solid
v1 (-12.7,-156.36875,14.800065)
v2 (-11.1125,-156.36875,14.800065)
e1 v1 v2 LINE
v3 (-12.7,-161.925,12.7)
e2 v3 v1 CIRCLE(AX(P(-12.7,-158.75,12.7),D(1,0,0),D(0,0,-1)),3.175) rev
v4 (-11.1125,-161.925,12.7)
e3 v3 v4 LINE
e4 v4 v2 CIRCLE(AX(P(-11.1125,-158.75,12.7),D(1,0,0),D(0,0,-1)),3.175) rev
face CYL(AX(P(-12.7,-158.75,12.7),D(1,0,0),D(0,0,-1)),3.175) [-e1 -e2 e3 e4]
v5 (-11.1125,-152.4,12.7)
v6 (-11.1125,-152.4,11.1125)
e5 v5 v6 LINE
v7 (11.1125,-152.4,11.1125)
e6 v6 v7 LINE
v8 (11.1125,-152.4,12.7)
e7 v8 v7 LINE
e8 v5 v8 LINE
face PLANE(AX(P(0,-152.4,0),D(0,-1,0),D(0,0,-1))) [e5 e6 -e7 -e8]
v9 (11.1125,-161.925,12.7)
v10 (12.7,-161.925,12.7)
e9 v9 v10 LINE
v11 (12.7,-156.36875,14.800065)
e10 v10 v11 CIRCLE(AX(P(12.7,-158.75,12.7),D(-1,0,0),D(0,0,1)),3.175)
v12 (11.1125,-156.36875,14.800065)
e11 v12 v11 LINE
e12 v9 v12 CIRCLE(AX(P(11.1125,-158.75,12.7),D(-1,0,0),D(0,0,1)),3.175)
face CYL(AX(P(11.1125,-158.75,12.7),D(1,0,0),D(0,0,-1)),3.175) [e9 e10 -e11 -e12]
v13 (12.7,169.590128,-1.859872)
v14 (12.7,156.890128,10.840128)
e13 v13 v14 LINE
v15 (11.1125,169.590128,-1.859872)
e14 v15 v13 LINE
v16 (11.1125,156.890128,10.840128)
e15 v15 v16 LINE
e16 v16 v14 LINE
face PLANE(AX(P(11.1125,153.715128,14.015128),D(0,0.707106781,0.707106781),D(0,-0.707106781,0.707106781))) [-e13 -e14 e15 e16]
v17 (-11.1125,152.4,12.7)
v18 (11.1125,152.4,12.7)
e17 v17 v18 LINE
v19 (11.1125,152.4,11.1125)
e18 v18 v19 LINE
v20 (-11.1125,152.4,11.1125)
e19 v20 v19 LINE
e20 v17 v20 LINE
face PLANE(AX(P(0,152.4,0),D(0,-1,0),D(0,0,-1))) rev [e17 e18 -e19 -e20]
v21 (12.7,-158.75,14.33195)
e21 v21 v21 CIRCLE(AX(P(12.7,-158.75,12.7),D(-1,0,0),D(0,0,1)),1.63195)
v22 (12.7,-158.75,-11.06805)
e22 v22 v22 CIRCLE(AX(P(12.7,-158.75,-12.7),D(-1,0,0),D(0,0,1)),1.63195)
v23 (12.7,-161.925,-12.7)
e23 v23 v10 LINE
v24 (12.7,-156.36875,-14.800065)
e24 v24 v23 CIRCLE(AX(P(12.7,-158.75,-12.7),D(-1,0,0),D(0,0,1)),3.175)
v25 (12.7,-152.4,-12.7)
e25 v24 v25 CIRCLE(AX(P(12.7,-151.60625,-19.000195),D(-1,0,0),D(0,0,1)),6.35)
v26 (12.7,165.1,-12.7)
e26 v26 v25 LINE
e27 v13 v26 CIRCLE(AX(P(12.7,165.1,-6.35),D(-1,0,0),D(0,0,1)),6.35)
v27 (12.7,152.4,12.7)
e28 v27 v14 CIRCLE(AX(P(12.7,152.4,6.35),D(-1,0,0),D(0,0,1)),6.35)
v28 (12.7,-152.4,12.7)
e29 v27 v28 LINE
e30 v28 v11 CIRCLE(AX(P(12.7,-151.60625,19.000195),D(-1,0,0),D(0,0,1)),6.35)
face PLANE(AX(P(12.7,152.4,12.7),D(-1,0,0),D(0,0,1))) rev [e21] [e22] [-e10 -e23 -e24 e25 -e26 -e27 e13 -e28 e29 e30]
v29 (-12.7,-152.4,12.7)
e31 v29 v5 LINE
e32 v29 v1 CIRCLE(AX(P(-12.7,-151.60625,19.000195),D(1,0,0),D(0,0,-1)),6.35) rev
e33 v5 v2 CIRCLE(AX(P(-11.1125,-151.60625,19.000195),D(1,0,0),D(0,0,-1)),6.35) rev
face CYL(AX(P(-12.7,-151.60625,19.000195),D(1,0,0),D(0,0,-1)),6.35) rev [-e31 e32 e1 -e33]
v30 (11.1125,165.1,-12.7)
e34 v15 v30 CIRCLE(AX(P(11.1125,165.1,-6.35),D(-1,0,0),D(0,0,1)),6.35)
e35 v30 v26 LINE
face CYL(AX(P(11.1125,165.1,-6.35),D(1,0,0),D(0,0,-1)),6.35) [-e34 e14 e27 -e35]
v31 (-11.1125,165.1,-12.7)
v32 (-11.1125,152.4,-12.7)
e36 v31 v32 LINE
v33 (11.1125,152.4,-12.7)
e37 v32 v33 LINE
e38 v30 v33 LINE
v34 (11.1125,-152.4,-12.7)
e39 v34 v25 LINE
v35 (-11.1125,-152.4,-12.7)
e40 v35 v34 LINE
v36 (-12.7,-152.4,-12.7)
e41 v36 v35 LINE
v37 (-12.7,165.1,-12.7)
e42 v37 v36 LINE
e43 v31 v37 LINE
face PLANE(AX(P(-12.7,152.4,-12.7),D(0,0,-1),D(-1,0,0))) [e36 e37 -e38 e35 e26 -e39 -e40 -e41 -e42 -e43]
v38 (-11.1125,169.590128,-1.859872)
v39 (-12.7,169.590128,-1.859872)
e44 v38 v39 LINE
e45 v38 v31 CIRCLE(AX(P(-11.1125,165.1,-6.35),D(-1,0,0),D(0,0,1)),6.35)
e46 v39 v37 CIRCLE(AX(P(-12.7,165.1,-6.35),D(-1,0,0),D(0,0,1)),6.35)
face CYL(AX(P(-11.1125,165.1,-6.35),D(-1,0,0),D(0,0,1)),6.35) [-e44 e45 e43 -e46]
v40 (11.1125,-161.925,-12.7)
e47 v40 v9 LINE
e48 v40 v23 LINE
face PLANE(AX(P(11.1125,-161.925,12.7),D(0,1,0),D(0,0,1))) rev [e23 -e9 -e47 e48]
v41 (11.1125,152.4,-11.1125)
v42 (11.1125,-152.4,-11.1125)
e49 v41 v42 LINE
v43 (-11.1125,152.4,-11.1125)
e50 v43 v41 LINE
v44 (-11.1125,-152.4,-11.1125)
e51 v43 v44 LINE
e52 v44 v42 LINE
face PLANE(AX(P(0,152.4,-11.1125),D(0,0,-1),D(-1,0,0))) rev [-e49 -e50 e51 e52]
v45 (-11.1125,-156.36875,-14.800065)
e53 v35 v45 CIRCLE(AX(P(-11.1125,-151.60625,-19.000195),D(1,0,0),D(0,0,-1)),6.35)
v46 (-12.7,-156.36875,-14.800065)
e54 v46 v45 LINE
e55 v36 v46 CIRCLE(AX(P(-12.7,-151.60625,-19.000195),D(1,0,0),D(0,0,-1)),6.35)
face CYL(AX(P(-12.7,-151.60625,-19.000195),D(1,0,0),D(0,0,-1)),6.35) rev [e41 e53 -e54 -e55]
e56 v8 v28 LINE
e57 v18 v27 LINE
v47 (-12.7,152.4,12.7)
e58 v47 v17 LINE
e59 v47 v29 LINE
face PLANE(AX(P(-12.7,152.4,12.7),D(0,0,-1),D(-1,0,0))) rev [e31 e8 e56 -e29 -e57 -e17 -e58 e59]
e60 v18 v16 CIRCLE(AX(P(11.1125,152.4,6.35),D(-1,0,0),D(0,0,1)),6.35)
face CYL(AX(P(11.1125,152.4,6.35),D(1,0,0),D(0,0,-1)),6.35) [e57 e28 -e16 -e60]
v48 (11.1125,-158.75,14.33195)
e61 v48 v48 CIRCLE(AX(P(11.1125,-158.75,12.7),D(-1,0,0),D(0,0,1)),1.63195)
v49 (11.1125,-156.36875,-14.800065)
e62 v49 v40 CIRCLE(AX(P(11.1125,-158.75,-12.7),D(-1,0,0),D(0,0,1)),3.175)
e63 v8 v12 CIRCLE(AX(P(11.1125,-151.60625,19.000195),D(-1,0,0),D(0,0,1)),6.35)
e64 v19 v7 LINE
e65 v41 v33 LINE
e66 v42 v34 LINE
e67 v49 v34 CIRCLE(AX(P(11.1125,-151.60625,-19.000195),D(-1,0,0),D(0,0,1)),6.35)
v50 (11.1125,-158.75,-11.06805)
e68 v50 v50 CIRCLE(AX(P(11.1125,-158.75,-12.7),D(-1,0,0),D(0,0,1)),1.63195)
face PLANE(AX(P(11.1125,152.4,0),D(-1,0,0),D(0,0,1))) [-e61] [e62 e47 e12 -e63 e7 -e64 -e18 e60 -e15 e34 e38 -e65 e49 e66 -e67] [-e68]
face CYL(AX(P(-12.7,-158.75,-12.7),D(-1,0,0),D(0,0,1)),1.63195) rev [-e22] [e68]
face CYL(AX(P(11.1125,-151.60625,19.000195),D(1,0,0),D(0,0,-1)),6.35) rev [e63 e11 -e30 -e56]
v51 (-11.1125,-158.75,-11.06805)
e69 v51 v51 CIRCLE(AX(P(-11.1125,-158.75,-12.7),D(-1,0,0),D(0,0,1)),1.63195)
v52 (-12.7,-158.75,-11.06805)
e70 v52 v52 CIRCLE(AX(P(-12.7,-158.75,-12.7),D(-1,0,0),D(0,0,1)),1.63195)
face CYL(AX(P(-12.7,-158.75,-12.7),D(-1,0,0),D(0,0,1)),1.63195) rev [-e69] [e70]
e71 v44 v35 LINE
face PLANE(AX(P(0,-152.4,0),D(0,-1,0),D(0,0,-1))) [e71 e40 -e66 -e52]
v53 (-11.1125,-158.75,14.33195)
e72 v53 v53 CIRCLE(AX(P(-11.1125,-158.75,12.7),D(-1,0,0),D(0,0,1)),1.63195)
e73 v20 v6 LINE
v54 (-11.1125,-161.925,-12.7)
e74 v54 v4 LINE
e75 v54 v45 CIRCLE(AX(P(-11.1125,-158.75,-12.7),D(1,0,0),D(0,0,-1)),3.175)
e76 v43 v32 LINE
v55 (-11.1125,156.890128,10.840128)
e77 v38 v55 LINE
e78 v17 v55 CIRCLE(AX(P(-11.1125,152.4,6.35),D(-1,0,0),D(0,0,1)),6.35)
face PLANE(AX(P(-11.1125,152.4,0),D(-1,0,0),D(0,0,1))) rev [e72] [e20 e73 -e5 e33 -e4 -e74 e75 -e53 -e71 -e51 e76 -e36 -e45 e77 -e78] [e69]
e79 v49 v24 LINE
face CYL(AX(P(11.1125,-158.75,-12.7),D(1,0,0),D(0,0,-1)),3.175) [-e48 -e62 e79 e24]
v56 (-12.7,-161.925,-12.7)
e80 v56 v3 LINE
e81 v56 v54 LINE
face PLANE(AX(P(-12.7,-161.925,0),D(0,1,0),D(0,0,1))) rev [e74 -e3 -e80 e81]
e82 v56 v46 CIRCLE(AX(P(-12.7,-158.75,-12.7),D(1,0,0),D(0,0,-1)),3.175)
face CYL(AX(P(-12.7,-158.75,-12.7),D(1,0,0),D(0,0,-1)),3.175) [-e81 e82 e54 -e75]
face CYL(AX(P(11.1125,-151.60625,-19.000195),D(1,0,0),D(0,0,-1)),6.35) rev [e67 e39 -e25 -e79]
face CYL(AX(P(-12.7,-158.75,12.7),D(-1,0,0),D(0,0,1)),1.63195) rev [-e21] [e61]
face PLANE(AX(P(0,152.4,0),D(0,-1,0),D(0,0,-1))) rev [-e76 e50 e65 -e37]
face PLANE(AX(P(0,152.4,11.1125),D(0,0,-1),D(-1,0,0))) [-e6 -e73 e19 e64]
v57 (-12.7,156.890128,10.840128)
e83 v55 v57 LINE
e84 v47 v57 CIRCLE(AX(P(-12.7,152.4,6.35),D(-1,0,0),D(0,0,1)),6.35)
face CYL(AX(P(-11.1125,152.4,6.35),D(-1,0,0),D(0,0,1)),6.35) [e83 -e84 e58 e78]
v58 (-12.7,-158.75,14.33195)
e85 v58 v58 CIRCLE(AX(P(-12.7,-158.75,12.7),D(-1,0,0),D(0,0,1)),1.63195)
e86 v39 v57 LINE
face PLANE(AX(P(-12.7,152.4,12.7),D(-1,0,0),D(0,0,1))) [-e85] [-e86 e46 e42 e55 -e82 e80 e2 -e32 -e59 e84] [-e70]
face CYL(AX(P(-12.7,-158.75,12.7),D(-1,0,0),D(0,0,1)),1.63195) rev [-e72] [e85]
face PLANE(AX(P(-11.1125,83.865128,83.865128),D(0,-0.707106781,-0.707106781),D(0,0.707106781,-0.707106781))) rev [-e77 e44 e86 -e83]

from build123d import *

# Parameters (mm, degrees)
SKETCH1_W             = 25.4
SKETCH1_H             = 25.4
SKETCH1_W_2           = 22.225
SKETCH1_H_2           = 22.225
EXTRUDE_THIN1_DEPTH   = 152.4
BOSS_EXTRUDE1_DEPTH   = 1.5875
BOSS_EXTRUDE2_START   = 22.225
BOSS_EXTRUDE2_DEPTH   = 1.5875
F_4_CLEARANCE_HOLE1_D = 3.2639
SKETCH11_R            = 6.35
BOSS_EXTRUDE3_DEPTH   = 1.5875
BOSS_EXTRUDE4_START   = -25.4
SKETCH11_3_R          = 6.35
BOSS_EXTRUDE4_DEPTH   = 1.5875


# Read off the part's stored shape, not the designer's step: Boss-Extrude2
with BuildPart() as part:
    # Sketch1 → Extrude-Thin1 (new, symmetric)
    with BuildSketch(Plane(origin=(0, 0, 0), x_dir=(1, 0, 0), z_dir=(0, 1, 0))):
        Rectangle(SKETCH1_W, SKETCH1_H)
        Rectangle(SKETCH1_W_2, SKETCH1_H_2, mode=Mode.SUBTRACT)
    extrude(amount=EXTRUDE_THIN1_DEPTH, both=True)

    # Sketch3 → Boss-Extrude1 (add)
    with BuildSketch(Plane(origin=(-11.1125, 0, 0), x_dir=(0, 0, -1), z_dir=(1, 0, 0))):
        with BuildLine():
            ThreePointArc((12.7, -161.925), (15.669940551, -159.872532015), (14.800065103, -156.36875))
            ThreePointArc((14.800065103, -156.36875), (13.387535234, -154.576190551), (12.7, -152.4))
            Line((12.7, -152.4), (-12.7, -152.4))
            ThreePointArc((-12.7, -152.4), (-13.387535234, -154.576190551), (-14.800065103, -156.36875))
            ThreePointArc((-14.800065103, -156.36875), (-15.669940551, -159.872532015), (-12.7, -161.925))
            Line((-12.7, -161.925), (12.7, -161.925))
        make_face()
    extrude(amount=-BOSS_EXTRUDE1_DEPTH)

    # Boss-Extrude2 outline → Boss-Extrude2 (add)
    with BuildSketch(Plane(origin=(-11.1125, 0, 0), x_dir=(0, 0, -1), z_dir=(1, 0, 0)).offset(BOSS_EXTRUDE2_START)):
        with BuildLine():
            Line((-12.7, -161.925), (12.7, -161.925))
            ThreePointArc((12.7, -161.925), (15.669940551, -159.872532015), (14.800065103, -156.36875))
            ThreePointArc((14.800065103, -156.36875), (13.387535234, -154.576190551), (12.7, -152.4))
            Line((12.7, -152.4), (-12.7, -152.4))
            ThreePointArc((-12.7, -152.4), (-13.387535234, -154.576190551), (-14.800065103, -156.36875))
            ThreePointArc((-14.800065103, -156.36875), (-15.669940551, -159.872532015), (-12.7, -161.925))
        make_face()
    extrude(amount=BOSS_EXTRUDE2_DEPTH)

    # #4 Clearance Hole1 (through all)
    with Locations(Plane.ZY.offset(12.7)):
        with Locations((-12.7, -158.75), (12.7, -158.75)):
            Hole(F_4_CLEARANCE_HOLE1_D / 2)

    # Sketch11 → Boss-Extrude3 (add)
    with BuildSketch(Plane.ZY.offset(12.7)):
        with Locations((-6.35, 165.1)):
            Circle(SKETCH11_R)
        with BuildLine():
            Line((10.840128061, 156.890128061), (-1.859871939, 169.590128061))
            ThreePointArc((-1.859871939, 169.590128061), (-0.483364969, 167.530039796), (0, 165.1))
            ThreePointArc((0, 165.1), (-6.35, 158.75), (-12.7, 165.1))
            Line((-12.7, 165.1), (-12.7, 152.4))
            Line((-12.7, 152.4), (12.7, 152.4))
            ThreePointArc((12.7, 152.4), (12.216635031, 154.830039796), (10.840128061, 156.890128061))
        make_face()
    extrude(amount=-BOSS_EXTRUDE3_DEPTH)

    # Sketch11<3> → Boss-Extrude4 (add)
    with BuildSketch(Plane.ZY.offset(12.7).offset(BOSS_EXTRUDE4_START)):
        with BuildLine():
            Line((10.840128061, 156.890128061), (-1.859871939, 169.590128061))
            ThreePointArc((-1.859871939, 169.590128061), (-0.483364969, 167.530039796), (0, 165.1))
            ThreePointArc((0, 165.1), (-6.35, 158.75), (-12.7, 165.1))
            Line((-12.7, 165.1), (-12.7, 152.4))
            Line((-12.7, 152.4), (12.7, 152.4))
            ThreePointArc((12.7, 152.4), (12.216635031, 154.830039796), (10.840128061, 156.890128061))
        make_face()
        with Locations((-6.35, 165.1)):
            Circle(SKETCH11_3_R)
    extrude(amount=BOSS_EXTRUDE4_DEPTH)


solid = part.part
